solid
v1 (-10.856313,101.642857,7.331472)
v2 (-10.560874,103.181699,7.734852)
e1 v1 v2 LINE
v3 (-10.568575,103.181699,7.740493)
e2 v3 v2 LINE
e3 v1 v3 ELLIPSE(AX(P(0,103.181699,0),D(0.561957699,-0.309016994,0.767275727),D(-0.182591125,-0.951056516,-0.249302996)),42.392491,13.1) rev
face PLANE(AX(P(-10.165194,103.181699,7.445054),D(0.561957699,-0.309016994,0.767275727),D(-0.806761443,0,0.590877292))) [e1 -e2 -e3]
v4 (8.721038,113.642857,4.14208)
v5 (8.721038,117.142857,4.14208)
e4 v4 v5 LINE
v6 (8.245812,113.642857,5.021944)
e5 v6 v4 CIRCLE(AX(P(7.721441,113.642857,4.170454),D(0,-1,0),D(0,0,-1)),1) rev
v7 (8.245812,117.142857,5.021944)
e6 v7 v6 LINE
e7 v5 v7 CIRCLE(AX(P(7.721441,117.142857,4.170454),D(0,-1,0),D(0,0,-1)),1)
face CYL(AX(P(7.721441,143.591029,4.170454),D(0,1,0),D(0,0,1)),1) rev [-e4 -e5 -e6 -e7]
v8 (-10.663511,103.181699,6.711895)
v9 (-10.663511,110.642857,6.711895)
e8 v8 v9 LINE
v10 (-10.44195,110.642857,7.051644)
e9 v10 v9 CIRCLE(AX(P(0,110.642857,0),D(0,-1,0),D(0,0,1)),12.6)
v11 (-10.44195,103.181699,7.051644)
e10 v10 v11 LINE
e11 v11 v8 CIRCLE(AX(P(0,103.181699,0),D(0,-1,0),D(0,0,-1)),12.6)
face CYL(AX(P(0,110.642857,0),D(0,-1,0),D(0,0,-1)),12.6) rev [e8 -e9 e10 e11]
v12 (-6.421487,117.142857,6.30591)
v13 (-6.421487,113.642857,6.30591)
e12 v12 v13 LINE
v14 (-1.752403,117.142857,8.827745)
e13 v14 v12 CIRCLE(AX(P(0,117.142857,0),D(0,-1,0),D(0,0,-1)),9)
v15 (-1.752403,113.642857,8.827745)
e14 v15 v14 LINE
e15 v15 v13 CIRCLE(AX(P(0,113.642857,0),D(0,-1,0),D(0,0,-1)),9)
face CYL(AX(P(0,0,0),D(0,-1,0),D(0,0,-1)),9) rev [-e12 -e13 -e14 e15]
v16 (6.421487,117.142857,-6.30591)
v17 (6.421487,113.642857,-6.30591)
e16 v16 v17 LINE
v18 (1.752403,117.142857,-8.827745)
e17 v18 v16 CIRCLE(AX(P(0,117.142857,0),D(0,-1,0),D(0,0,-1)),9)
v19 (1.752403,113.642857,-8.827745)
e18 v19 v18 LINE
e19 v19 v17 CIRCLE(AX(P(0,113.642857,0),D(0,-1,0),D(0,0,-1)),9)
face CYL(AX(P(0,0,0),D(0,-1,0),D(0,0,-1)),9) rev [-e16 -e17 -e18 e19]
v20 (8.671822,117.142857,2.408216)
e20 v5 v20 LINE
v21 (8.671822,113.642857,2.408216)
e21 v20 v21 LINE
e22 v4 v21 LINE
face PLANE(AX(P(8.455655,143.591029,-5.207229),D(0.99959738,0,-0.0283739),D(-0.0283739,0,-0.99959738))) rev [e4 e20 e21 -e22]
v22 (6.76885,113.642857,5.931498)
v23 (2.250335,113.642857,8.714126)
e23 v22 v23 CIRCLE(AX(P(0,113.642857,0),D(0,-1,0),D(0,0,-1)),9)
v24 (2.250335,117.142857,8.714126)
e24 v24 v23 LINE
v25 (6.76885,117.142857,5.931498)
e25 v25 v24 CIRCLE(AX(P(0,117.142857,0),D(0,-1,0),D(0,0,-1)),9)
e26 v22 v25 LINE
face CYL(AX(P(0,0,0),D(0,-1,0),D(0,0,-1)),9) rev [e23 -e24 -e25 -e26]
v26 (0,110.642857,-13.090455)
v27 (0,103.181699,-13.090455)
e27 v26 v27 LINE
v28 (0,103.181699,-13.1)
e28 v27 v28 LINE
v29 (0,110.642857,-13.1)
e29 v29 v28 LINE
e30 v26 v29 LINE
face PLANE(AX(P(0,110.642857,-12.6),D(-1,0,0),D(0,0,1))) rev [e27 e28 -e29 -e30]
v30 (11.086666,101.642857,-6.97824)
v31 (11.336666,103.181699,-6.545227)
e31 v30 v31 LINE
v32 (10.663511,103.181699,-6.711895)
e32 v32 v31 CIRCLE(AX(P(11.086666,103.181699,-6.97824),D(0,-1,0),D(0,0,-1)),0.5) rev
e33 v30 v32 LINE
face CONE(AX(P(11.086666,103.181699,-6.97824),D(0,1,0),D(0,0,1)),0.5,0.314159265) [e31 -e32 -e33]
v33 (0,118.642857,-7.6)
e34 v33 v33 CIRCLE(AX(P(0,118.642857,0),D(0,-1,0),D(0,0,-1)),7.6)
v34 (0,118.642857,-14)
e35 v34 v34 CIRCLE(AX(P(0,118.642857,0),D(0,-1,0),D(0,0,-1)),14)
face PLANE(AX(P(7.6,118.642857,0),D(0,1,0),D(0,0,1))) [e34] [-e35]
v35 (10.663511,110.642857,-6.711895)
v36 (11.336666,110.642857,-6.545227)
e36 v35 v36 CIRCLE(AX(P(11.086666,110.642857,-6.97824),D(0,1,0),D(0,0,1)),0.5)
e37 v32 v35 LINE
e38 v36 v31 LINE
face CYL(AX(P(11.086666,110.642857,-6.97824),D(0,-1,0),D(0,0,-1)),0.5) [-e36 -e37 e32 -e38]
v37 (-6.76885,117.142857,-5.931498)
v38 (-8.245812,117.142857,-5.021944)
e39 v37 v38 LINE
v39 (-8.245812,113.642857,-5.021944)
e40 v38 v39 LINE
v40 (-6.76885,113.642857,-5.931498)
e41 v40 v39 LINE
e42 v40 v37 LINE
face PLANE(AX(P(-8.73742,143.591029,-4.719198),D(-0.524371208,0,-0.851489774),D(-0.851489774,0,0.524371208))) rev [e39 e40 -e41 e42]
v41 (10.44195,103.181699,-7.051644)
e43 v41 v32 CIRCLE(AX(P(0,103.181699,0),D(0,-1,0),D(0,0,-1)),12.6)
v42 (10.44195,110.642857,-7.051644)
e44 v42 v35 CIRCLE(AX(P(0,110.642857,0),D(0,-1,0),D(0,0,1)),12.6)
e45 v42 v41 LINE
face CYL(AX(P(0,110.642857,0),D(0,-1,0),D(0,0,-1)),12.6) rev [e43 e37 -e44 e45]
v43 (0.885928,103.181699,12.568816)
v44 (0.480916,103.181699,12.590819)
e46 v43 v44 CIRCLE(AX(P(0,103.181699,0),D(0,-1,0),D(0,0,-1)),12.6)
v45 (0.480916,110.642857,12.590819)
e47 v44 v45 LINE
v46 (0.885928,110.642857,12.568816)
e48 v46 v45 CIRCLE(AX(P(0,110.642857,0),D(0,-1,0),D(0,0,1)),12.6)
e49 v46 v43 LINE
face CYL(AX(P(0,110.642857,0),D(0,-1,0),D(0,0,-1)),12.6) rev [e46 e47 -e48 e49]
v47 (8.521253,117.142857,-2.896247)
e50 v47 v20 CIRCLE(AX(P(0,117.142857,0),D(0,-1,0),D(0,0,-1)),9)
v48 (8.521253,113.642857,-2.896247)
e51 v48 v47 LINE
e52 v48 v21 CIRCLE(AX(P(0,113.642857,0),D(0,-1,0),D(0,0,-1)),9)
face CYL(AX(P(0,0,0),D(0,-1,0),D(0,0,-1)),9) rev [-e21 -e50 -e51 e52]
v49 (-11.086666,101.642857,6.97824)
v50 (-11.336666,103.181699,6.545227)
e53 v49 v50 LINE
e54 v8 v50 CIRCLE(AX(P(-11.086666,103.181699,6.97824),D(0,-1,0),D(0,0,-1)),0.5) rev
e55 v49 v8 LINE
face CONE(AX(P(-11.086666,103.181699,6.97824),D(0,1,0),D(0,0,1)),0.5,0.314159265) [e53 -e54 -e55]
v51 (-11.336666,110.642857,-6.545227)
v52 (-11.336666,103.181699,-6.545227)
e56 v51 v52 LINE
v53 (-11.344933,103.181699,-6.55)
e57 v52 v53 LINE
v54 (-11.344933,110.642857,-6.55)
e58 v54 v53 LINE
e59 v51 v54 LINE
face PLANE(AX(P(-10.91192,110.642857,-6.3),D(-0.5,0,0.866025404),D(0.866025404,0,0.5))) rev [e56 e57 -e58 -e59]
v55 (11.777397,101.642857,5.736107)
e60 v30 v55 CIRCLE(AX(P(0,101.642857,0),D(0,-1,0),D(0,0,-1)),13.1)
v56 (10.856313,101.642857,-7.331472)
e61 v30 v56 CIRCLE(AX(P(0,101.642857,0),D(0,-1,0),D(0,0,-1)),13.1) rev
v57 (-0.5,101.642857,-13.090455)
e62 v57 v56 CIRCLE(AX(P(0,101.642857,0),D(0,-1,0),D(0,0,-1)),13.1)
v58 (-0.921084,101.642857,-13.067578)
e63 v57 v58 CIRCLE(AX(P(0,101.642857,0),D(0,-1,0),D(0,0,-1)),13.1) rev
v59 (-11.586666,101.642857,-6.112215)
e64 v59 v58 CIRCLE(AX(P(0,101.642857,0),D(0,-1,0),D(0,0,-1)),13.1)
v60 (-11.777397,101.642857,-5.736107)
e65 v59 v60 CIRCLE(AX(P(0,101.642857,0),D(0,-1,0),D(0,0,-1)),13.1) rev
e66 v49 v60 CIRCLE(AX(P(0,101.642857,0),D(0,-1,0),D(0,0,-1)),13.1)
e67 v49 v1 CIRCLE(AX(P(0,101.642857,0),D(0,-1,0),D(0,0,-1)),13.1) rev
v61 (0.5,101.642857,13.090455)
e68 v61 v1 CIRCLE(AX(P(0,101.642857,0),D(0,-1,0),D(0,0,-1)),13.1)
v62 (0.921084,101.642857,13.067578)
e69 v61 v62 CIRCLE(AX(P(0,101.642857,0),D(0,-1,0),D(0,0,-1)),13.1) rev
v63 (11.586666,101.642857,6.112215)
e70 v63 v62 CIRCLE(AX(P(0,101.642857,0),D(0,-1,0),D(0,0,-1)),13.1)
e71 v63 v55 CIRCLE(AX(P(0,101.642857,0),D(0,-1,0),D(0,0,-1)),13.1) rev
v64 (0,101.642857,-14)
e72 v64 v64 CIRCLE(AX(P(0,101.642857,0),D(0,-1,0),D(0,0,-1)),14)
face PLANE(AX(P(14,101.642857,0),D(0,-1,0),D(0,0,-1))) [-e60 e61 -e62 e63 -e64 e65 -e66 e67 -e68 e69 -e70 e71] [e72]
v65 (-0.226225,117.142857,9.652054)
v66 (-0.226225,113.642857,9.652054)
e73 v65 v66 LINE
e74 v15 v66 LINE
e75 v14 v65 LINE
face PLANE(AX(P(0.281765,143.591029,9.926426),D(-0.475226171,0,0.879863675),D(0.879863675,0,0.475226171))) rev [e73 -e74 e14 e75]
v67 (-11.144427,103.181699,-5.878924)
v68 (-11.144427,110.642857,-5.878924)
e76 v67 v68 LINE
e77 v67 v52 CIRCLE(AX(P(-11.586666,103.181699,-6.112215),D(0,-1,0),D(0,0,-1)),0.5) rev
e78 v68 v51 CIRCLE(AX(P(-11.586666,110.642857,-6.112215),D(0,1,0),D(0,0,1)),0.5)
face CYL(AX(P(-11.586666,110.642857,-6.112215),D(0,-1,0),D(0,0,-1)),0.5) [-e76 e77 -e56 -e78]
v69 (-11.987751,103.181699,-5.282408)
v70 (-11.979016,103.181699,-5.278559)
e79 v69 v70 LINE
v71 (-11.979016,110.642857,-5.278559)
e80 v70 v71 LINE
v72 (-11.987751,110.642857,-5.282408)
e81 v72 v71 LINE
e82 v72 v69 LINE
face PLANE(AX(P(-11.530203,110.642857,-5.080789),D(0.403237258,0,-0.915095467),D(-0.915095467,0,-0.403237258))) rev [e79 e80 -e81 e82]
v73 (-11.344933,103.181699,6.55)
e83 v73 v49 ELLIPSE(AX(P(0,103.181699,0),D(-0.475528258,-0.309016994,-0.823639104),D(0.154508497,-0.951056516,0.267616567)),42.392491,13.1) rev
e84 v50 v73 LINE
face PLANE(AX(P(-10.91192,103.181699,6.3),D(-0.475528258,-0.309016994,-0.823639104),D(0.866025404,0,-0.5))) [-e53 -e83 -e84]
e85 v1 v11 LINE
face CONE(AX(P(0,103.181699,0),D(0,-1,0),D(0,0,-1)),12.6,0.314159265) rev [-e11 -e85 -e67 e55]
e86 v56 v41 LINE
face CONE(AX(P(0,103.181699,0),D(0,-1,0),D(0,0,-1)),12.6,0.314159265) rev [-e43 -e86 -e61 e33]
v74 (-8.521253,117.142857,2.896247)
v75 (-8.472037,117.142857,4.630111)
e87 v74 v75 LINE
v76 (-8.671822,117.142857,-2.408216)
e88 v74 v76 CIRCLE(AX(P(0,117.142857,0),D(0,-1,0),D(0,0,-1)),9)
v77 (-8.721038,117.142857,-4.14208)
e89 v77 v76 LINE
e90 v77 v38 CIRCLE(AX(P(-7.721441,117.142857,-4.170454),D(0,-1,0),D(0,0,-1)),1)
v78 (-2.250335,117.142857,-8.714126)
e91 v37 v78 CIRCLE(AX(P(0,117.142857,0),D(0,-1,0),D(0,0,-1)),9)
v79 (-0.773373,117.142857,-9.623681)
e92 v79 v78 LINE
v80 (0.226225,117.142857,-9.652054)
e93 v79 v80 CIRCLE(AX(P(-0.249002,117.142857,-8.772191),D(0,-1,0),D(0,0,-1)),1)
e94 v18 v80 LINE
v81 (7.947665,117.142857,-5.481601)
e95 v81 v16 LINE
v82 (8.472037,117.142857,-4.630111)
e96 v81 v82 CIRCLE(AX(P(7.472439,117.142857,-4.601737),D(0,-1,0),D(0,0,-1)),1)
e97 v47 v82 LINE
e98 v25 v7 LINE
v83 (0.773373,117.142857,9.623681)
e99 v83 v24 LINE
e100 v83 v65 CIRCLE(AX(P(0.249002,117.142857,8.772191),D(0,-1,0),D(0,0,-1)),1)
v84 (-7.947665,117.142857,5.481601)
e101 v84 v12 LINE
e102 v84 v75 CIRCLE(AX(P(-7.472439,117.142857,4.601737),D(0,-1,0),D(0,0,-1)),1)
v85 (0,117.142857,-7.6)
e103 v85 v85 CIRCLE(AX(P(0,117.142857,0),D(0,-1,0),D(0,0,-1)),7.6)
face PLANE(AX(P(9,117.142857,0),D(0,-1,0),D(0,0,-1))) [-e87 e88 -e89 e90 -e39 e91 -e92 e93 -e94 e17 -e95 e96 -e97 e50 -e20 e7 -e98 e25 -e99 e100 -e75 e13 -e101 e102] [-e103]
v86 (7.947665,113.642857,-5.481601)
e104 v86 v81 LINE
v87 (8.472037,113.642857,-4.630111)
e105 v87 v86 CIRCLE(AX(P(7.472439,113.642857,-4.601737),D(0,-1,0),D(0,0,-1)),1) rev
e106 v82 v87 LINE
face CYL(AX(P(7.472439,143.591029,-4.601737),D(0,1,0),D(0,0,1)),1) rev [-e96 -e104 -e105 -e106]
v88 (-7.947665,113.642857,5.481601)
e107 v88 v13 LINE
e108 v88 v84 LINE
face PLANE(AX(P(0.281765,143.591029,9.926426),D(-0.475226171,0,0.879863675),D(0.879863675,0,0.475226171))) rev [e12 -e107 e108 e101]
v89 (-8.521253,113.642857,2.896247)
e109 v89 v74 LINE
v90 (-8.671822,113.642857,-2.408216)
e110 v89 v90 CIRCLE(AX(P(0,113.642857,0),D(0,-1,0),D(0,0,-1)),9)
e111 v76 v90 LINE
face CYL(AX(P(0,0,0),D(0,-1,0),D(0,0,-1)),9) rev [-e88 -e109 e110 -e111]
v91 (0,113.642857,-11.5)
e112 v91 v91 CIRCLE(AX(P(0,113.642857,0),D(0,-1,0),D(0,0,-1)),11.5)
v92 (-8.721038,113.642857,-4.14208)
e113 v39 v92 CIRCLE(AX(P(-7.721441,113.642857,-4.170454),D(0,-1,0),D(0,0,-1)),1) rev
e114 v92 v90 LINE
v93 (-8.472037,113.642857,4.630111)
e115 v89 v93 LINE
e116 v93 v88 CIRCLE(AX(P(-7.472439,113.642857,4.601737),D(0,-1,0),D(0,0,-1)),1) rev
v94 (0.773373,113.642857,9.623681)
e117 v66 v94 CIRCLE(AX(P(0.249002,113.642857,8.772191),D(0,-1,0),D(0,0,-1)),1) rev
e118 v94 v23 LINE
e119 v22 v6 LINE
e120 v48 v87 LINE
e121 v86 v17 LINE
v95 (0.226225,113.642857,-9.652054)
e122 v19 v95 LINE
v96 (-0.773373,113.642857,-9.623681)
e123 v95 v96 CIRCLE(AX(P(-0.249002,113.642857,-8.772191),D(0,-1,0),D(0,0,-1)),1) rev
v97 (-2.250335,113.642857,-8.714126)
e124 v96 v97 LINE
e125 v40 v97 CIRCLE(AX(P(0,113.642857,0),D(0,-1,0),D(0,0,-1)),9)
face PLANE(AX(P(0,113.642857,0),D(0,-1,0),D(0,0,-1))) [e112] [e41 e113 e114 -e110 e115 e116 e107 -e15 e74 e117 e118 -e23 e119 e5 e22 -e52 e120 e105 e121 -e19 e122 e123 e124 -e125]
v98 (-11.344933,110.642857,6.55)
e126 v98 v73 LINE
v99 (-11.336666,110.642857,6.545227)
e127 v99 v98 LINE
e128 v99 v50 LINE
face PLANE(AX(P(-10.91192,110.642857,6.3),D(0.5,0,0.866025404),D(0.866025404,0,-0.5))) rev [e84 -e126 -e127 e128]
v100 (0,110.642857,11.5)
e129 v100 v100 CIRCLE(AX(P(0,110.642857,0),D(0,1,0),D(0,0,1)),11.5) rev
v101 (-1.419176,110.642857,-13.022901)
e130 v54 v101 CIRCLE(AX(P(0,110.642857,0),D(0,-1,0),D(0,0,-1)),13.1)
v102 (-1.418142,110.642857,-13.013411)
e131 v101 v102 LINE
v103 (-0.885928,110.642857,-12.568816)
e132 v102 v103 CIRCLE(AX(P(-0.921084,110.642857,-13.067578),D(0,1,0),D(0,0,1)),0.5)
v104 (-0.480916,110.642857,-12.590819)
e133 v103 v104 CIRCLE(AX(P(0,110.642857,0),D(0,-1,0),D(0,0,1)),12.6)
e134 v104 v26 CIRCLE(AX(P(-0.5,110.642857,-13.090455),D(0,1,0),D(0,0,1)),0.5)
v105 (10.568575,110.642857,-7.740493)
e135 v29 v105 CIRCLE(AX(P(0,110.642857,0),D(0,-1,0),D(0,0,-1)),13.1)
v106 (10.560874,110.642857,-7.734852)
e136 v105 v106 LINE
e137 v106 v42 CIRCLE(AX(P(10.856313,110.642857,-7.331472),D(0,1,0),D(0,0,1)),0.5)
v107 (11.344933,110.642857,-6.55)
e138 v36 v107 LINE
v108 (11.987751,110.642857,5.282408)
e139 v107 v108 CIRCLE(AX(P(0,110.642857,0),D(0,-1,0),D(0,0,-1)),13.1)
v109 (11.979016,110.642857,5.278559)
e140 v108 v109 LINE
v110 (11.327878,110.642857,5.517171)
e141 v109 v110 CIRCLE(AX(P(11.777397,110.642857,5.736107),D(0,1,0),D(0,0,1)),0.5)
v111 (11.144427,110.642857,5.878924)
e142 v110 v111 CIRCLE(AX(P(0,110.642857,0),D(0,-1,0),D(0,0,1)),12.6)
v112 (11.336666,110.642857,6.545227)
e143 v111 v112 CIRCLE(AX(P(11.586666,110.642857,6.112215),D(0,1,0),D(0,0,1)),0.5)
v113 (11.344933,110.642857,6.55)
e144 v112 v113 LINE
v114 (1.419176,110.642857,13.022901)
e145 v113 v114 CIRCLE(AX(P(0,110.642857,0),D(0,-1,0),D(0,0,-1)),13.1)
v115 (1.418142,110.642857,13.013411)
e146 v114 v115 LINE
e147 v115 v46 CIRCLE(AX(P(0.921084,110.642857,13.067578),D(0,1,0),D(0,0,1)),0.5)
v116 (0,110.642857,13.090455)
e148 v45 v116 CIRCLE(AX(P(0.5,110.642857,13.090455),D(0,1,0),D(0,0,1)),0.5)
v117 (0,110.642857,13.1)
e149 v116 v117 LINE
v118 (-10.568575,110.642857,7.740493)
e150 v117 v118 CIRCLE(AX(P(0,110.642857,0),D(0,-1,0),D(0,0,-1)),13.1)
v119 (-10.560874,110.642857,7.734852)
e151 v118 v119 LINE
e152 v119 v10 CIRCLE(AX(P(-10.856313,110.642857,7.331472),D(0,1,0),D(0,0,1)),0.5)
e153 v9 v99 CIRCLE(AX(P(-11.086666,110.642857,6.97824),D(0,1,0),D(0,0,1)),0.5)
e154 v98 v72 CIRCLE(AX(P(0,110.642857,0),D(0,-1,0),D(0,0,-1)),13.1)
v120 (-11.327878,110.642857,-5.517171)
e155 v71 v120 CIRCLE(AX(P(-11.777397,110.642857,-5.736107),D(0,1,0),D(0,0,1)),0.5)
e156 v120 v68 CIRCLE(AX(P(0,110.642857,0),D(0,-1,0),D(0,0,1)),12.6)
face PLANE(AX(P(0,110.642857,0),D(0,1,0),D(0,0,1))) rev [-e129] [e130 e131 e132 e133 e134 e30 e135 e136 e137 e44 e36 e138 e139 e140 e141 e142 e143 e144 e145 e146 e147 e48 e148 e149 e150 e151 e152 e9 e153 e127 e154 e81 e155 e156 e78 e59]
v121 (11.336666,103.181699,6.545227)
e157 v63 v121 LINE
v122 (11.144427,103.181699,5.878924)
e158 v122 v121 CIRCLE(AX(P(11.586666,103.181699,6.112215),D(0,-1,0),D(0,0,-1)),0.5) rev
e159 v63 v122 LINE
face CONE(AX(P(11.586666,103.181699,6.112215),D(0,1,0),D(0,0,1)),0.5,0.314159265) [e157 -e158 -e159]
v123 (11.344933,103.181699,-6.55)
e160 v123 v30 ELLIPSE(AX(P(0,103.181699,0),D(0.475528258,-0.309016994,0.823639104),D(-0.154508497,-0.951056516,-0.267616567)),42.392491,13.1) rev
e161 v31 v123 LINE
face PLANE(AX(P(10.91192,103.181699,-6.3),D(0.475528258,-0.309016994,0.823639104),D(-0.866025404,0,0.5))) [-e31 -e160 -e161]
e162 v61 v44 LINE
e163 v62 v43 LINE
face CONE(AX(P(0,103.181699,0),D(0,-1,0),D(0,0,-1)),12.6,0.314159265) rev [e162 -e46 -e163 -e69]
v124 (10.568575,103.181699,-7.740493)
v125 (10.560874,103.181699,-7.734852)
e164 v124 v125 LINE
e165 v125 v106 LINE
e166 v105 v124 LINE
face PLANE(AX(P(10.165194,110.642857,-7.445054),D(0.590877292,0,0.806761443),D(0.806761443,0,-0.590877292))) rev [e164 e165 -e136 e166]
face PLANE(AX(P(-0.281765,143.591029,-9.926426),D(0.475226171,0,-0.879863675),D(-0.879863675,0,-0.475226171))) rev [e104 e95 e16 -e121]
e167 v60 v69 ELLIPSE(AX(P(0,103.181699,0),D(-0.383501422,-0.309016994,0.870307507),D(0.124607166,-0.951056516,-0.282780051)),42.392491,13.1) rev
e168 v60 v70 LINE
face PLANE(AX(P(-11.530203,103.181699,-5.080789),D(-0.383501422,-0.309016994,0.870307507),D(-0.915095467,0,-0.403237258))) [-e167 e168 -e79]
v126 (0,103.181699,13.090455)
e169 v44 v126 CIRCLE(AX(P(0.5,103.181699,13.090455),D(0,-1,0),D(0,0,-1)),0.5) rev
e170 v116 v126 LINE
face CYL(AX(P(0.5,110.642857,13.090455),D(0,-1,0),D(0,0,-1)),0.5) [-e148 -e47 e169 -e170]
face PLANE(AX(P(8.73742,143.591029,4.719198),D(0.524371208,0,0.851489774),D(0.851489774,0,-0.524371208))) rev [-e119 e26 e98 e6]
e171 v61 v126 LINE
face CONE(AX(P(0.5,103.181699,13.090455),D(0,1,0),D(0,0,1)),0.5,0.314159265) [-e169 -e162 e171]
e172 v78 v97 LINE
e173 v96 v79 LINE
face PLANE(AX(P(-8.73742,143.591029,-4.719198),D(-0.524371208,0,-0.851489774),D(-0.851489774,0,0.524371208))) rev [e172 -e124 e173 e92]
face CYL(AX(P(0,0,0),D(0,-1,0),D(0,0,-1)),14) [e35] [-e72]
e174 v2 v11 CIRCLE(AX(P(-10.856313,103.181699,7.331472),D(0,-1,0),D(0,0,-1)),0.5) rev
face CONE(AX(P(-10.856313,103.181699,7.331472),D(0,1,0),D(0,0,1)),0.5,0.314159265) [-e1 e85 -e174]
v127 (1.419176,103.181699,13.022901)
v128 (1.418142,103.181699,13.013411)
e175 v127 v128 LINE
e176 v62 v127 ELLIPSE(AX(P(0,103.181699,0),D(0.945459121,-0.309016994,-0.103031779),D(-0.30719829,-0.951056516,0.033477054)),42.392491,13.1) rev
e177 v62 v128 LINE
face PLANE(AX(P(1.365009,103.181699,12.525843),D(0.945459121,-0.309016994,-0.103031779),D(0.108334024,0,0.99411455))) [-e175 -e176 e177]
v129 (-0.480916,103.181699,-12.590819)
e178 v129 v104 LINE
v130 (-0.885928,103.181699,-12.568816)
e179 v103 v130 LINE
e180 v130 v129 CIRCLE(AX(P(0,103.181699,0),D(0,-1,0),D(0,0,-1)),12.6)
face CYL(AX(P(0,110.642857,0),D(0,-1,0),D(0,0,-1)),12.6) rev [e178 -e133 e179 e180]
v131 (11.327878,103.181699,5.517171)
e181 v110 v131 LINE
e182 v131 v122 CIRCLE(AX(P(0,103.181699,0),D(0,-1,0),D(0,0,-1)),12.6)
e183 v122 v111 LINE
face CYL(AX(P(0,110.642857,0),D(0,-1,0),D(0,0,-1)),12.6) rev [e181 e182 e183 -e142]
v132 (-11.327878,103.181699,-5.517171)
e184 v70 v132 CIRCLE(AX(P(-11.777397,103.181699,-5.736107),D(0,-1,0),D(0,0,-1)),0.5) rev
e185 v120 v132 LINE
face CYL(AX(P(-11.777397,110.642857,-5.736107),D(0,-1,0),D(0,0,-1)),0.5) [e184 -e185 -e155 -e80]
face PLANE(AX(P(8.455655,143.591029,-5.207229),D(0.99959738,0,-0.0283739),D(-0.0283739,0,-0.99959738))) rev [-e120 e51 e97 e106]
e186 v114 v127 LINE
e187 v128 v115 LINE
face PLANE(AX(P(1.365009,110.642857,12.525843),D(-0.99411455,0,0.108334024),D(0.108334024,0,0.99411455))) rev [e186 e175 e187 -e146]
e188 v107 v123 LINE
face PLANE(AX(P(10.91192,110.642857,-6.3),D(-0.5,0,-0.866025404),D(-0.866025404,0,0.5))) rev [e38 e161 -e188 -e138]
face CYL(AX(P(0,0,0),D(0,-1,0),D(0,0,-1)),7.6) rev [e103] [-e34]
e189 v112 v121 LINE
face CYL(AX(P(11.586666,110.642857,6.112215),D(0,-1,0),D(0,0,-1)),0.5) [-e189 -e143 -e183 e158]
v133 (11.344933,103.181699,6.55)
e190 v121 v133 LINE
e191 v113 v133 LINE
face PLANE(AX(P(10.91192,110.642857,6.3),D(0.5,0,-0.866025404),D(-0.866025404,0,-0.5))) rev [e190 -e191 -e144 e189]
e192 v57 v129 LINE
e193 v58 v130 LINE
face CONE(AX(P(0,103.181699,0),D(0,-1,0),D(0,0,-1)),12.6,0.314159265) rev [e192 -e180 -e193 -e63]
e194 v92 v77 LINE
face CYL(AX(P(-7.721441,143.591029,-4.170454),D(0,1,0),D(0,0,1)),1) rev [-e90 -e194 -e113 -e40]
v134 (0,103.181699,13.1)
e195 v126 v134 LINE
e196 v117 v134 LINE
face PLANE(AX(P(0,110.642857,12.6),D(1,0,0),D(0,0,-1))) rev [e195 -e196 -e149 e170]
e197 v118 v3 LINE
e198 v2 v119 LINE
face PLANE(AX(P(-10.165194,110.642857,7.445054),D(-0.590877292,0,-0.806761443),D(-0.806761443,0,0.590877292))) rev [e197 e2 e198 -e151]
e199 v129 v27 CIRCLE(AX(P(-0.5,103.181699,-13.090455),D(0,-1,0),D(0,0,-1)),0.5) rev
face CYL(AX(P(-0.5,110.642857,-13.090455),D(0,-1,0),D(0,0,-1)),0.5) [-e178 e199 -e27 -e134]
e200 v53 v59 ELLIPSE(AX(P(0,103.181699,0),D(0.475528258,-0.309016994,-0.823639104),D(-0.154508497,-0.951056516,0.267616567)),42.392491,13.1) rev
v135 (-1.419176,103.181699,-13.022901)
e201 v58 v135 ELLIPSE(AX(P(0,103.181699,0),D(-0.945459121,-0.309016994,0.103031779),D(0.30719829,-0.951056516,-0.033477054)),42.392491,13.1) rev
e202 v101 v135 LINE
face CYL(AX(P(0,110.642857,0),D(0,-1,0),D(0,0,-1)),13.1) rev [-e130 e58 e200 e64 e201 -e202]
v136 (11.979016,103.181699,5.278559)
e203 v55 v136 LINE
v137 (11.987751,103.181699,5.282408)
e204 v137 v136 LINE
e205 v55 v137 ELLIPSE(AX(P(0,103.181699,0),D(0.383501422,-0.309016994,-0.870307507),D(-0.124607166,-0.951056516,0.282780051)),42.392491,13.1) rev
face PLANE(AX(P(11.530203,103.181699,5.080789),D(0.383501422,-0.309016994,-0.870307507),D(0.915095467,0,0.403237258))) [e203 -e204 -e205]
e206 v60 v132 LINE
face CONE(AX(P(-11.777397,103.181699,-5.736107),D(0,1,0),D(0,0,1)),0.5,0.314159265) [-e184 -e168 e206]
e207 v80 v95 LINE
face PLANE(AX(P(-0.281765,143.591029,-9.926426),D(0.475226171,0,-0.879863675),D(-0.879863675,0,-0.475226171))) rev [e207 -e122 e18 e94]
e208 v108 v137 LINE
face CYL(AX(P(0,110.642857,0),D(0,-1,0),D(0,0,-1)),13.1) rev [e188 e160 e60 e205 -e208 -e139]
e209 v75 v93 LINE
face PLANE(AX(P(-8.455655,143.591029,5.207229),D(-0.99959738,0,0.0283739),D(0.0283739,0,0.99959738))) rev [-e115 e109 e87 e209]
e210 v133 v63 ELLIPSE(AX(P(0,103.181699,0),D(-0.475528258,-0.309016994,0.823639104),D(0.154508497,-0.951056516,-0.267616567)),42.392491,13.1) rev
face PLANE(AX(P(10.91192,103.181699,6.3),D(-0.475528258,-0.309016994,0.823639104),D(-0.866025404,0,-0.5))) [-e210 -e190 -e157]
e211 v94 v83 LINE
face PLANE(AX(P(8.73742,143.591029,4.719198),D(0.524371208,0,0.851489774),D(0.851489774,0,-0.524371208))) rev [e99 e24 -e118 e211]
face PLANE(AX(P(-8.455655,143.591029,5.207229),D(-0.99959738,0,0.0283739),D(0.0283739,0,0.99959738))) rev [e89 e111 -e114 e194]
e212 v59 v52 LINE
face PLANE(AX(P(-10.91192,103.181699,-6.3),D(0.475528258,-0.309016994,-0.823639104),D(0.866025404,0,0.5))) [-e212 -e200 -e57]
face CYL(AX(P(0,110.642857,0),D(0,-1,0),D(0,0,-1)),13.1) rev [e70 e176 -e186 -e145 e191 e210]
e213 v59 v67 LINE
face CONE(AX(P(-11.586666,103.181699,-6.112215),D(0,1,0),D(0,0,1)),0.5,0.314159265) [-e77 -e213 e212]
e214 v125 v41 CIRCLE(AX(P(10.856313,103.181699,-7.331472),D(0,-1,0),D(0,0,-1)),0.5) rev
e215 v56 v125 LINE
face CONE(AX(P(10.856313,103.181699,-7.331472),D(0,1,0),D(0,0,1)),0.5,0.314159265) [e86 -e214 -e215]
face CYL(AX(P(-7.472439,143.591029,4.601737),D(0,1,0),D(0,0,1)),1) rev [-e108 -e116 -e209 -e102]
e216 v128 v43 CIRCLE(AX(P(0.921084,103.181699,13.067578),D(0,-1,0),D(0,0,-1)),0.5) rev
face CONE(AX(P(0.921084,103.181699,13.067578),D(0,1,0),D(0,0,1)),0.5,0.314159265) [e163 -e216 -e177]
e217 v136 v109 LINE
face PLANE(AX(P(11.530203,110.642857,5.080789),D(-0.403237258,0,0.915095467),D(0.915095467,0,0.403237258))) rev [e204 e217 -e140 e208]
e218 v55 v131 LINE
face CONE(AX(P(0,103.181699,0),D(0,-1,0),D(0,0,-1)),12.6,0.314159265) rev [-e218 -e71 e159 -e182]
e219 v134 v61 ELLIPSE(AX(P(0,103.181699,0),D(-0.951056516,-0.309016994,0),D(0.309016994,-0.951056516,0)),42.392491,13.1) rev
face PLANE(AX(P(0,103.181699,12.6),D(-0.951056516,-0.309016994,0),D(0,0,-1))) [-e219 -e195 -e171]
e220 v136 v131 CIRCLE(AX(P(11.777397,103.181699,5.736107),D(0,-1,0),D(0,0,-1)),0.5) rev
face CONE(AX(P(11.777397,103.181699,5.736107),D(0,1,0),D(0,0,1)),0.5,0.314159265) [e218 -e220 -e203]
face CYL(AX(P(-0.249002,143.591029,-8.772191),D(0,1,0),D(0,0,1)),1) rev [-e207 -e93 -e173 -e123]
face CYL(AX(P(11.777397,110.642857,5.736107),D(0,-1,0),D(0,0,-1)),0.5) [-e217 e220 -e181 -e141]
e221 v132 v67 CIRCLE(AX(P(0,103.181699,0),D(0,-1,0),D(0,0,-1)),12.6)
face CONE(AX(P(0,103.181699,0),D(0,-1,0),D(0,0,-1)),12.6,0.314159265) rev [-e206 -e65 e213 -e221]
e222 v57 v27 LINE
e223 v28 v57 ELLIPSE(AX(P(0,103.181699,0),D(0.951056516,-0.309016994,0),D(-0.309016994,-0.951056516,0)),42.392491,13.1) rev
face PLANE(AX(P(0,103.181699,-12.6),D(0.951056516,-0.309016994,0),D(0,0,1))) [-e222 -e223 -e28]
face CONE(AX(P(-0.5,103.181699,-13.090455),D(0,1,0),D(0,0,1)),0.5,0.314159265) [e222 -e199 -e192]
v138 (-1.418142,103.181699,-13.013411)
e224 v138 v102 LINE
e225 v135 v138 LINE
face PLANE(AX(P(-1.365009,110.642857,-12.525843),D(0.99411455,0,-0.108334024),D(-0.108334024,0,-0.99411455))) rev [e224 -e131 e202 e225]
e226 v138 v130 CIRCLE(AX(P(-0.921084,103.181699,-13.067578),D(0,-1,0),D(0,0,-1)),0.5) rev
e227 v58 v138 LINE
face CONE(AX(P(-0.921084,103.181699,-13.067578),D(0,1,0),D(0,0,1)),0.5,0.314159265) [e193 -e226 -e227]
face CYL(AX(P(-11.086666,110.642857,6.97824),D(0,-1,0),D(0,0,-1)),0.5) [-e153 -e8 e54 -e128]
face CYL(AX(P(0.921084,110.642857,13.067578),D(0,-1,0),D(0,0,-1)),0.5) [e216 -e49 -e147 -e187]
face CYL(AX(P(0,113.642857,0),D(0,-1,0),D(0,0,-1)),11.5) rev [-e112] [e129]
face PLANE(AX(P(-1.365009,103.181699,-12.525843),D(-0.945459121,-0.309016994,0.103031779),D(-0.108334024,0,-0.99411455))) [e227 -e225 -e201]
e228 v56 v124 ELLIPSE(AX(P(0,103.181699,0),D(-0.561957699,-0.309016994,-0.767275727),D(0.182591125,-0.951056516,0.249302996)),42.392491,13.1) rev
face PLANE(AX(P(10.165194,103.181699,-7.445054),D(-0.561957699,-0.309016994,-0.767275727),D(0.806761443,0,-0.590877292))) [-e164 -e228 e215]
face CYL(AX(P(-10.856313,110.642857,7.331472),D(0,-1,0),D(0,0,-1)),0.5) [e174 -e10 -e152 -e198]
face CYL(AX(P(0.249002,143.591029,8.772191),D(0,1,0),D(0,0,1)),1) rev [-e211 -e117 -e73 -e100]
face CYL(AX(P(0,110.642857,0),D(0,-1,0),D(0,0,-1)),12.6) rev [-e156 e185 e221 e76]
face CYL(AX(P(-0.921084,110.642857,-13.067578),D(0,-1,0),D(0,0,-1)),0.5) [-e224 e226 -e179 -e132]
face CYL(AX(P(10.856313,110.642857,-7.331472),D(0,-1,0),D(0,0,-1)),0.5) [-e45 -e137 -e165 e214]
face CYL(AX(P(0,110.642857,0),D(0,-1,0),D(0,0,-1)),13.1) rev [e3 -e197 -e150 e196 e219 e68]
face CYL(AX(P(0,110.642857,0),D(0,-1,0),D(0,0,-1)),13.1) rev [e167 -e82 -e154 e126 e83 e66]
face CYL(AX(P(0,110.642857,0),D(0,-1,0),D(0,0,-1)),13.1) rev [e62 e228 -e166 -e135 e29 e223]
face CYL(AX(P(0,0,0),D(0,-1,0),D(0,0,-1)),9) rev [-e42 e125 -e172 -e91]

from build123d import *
from OCP.BRepFilletAPI import BRepFilletAPI_MakeChamfer

# Parameters (mm, degrees)
CUT_EXTRUDE_1_DEPTH  = 15.5
SKETCH_4_R           = 11.5
CUT_EXTRUDE_9_DEPTH  = 12
CUT_EXTRUDE_10_DEPTH = 9
FILLET_1_R           = 1
FILLET_2_R           = 0.5
CHAMFER_1_SIZE       = 1.538841769
CHAMFER_1_SIZE_2     = 0.5


with BuildPart() as part:
    # Эскиз1 → Повернуть1 (revolve)
    with BuildSketch(Plane.XY, mode=Mode.PRIVATE) as revolve_1_sk:
        Polygon((7.6, 118.642857143), (14, 118.642857143), (14, 101.642857143), (9, 101.642857143), (9, 117.142857143), (7.6, 117.142857143), align=None)
    revolve(revolve_1_sk.sketch.rotate(Axis((0, 0, 0), (0, 1, 0)), 90), axis=Axis((0, 0, 0), (0, 1, 0)))

    # Эскиз2 → Вырез-Вытянуть1 (cut)
    with BuildSketch(Plane.XZ.offset(-101.642857143)):
        Polygon((0.281764878, 9.926426441), (-8.455655027, 5.207228763), (-8.737419906, -4.719197678), (-0.281764878, -9.926426441), (8.455655027, -5.207228763), (8.737419906, 4.719197678), align=None)
    extrude(amount=-CUT_EXTRUDE_1_DEPTH, mode=Mode.SUBTRACT)

    # Эскиз4 → Вырез-Вытянуть9 (cut)
    with BuildSketch(Plane.XZ.offset(-101.642857143)):
        with Locations(Location((0, 0, 0), (0, 0, 270))):
            Circle(SKETCH_4_R)
    extrude(amount=-CUT_EXTRUDE_9_DEPTH, mode=Mode.SUBTRACT)

    # Эскиз5 → Вырез-Вытянуть10 (cut)
    with BuildSketch(Plane.XZ.offset(-101.642857143)):
        with BuildLine():
            Line((0, 12.6), (0, 13.1))
            ThreePointArc((0, 13.1), (-5.924928182, 11.683545097), (-10.568574903, 7.740492524))
            Line((-10.568574903, 7.740492524), (-10.165194182, 7.445053878))
            ThreePointArc((-10.165194182, 7.445053878), (-10.554097478, 6.882661289), (-10.911920088, 6.3))
            Line((-10.911920088, 6.3), (-11.34493279, 6.55))
            ThreePointArc((-11.34493279, 6.55), (-13.080710951, 0.710634227), (-11.987750615, -5.282408086))
            Line((-11.987750615, -5.282408086), (-11.530202882, -5.080789457))
            ThreePointArc((-11.530202882, -5.080789457), (-11.237608261, -5.698785885), (-10.911920088, -6.3))
            Line((-10.911920088, -6.3), (-11.34493279, -6.55))
            ThreePointArc((-11.34493279, -6.55), (-7.155782769, -10.97291087), (-1.419175712, -13.02290061))
            Line((-1.419175712, -13.02290061), (-1.3650087, -12.525843335))
            ThreePointArc((-1.3650087, -12.525843335), (-0.683510783, -12.581447175), (0, -12.6))
            Line((0, -12.6), (0, -13.1))
            ThreePointArc((0, -13.1), (5.924928182, -11.683545097), (10.568574903, -7.740492524))
            Line((10.568574903, -7.740492524), (10.165194182, -7.445053878))
            ThreePointArc((10.165194182, -7.445053878), (10.554097478, -6.882661289), (10.911920088, -6.3))
            Line((10.911920088, -6.3), (11.34493279, -6.55))
            ThreePointArc((11.34493279, -6.55), (13.080710951, -0.710634227), (11.987750615, 5.282408086))
            Line((11.987750615, 5.282408086), (11.530202882, 5.080789457))
            ThreePointArc((11.530202882, 5.080789457), (11.237608261, 5.698785885), (10.911920088, 6.3))
            Line((10.911920088, 6.3), (11.34493279, 6.55))
            ThreePointArc((11.34493279, 6.55), (7.155782769, 10.97291087), (1.419175712, 13.02290061))
            Line((1.419175712, 13.02290061), (1.3650087, 12.525843335))
            ThreePointArc((1.3650087, 12.525843335), (0.683510783, 12.581447175), (0, 12.6))
        make_face()
    extrude(amount=-CUT_EXTRUDE_10_DEPTH, mode=Mode.SUBTRACT)

    # Скругление1
    fillet_1_edges = [part.edges().sort_by_distance(p)[0] for p in [
        (-8.455655027, 115.392857143, 5.207228763),
        (0.281764878, 115.392857143, 9.926426441),
        (8.737419906, 115.392857143, 4.719197678),
        (8.455655027, 115.392857143, -5.207228763),
        (-0.281764878, 115.392857143, -9.926426441),
        (-8.737419906, 115.392857143, -4.719197678),
    ]]
    fillet(fillet_1_edges, radius=FILLET_1_R)

    # Скругление2
    fillet_2_edges = [part.edges().sort_by_distance(p)[0] for p in [
        (0, 106.142857143, 12.6),
        (1.3650087, 106.142857143, 12.525843335),
        (10.911920088, 106.142857143, 6.3),
        (11.530202882, 106.142857143, 5.080789457),
        (10.911920088, 106.142857143, -6.3),
        (10.165194182, 106.142857143, -7.445053878),
        (0, 106.142857143, -12.6),
        (-1.3650087, 106.142857143, -12.525843335),
        (-10.911920088, 106.142857143, -6.3),
        (-11.530202882, 106.142857143, -5.080789457),
        (-10.911920088, 106.142857143, 6.3),
        (-10.165194182, 106.142857143, 7.445053878),
    ]]
    fillet(fillet_2_edges, radius=FILLET_2_R)

    # Фаска1
    chamfer_1_edges_1 = [part.edges().sort_by_distance(p)[0] for p in [
        (-10.564724448, 101.642857143, 7.737672426),
    ]]
    chamfer_1_side_1 = [part.faces().sort_by_distance(p)[0] for p in [
        (-10.564724448, 101.652857143, 7.737672426),
    ]]
    chamfer_1_edges_2 = [part.edges().sort_by_distance(p)[0] for p in [
        (-11.983383111, 101.642857143, -5.280483543),
    ]]
    chamfer_1_side_2 = [part.faces().sort_by_distance(p)[0] for p in [
        (-11.983383111, 101.652857143, -5.280483543),
    ]]
    chamfer_1_edges_3 = [part.edges().sort_by_distance(p)[0] for p in [
        (-1.418658663, 101.642857143, -13.018155968),
    ]]
    chamfer_1_side_3 = [part.faces().sort_by_distance(p)[0] for p in [
        (-1.418658663, 101.652857143, -13.018155968),
    ]]
    chamfer_1_edges_4 = [part.edges().sort_by_distance(p)[0] for p in [
        (10.564724448, 101.642857143, -7.737672426),
    ]]
    chamfer_1_side_4 = [part.faces().sort_by_distance(p)[0] for p in [
        (10.564724448, 101.652857143, -7.737672426),
    ]]
    chamfer_1_edges_5 = [part.edges().sort_by_distance(p)[0] for p in [
        (11.983383111, 101.642857143, 5.280483543),
    ]]
    chamfer_1_side_5 = [part.faces().sort_by_distance(p)[0] for p in [
        (11.983383111, 101.652857143, 5.280483543),
    ]]
    chamfer_1_edges_6 = [part.edges().sort_by_distance(p)[0] for p in [
        (1.418658663, 101.642857143, 13.018155968),
    ]]
    chamfer_1_side_6 = [part.faces().sort_by_distance(p)[0] for p in [
        (1.418658663, 101.652857143, 13.018155968),
    ]]
    chamfer_1_edges_7 = [part.edges().sort_by_distance(p)[0] for p in [
        (10.554097478, 101.642857143, -6.882661289),
    ]]
    chamfer_1_side_7 = [part.faces().sort_by_distance(p)[0] for p in [
        (10.554097478, 101.652857143, -6.882661289),
    ]]
    chamfer_1_edges_8 = [part.edges().sort_by_distance(p)[0] for p in [
        (0.683510783, 101.642857143, 12.581447175),
    ]]
    chamfer_1_side_8 = [part.faces().sort_by_distance(p)[0] for p in [
        (0.683510783, 101.652857143, 12.581447175),
    ]]
    chamfer_1_edges_9 = [part.edges().sort_by_distance(p)[0] for p in [
        (11.340799483, 101.642857143, 6.547613634),
    ]]
    chamfer_1_side_9 = [part.faces().sort_by_distance(p)[0] for p in [
        (11.340799483, 101.652857143, 6.547613634),
    ]]
    chamfer_1_edges_10 = [part.edges().sort_by_distance(p)[0] for p in [
        (11.237608261, 101.642857143, 5.698785885),
    ]]
    chamfer_1_side_10 = [part.faces().sort_by_distance(p)[0] for p in [
        (11.237608261, 101.652857143, 5.698785885),
    ]]
    chamfer_1_edges_11 = [part.edges().sort_by_distance(p)[0] for p in [
        (11.340799483, 101.642857143, -6.547613634),
    ]]
    chamfer_1_side_11 = [part.faces().sort_by_distance(p)[0] for p in [
        (11.340799483, 101.652857143, -6.547613634),
    ]]
    chamfer_1_edges_12 = [part.edges().sort_by_distance(p)[0] for p in [
        (0, 101.642857143, -13.095227269),
    ]]
    chamfer_1_side_12 = [part.faces().sort_by_distance(p)[0] for p in [
        (0, 101.652857143, -13.095227269),
    ]]
    chamfer_1_edges_13 = [part.edges().sort_by_distance(p)[0] for p in [
        (-0.683510783, 101.642857143, -12.581447175),
    ]]
    chamfer_1_side_13 = [part.faces().sort_by_distance(p)[0] for p in [
        (-0.683510783, 101.652857143, -12.581447175),
    ]]
    chamfer_1_edges_14 = [part.edges().sort_by_distance(p)[0] for p in [
        (-11.340799483, 101.642857143, -6.547613634),
    ]]
    chamfer_1_side_14 = [part.faces().sort_by_distance(p)[0] for p in [
        (-11.340799483, 101.652857143, -6.547613634),
    ]]
    chamfer_1_edges_15 = [part.edges().sort_by_distance(p)[0] for p in [
        (-11.237608261, 101.642857143, -5.698785885),
    ]]
    chamfer_1_side_15 = [part.faces().sort_by_distance(p)[0] for p in [
        (-11.237608261, 101.652857143, -5.698785885),
    ]]
    chamfer_1_edges_16 = [part.edges().sort_by_distance(p)[0] for p in [
        (-11.340799483, 101.642857143, 6.547613634),
    ]]
    chamfer_1_side_16 = [part.faces().sort_by_distance(p)[0] for p in [
        (-11.340799483, 101.652857143, 6.547613634),
    ]]
    chamfer_1_edges_17 = [part.edges().sort_by_distance(p)[0] for p in [
        (-10.554097478, 101.642857143, 6.882661289),
    ]]
    chamfer_1_side_17 = [part.faces().sort_by_distance(p)[0] for p in [
        (-10.554097478, 101.652857143, 6.882661289),
    ]]
    chamfer_1_edges_18 = [part.edges().sort_by_distance(p)[0] for p in [
        (0, 101.642857143, 13.095227269),
    ]]
    chamfer_1_side_18 = [part.faces().sort_by_distance(p)[0] for p in [
        (0, 101.652857143, 13.095227269),
    ]]
    chamfer_1_edges_19 = [part.edges().sort_by_distance(p)[0] for p in [
        (0.139762589, 101.642857143, 12.74371399),
    ]]
    chamfer_1_side_19 = [part.faces().sort_by_distance(p)[0] for p in [
        (0.139762589, 101.652857143, 12.74371399),
    ]]
    chamfer_1_edges_20 = [part.edges().sort_by_distance(p)[0] for p in [
        (1.241637792, 101.642857143, 12.683852547),
    ]]
    chamfer_1_side_20 = [part.faces().sort_by_distance(p)[0] for p in [
        (1.241637792, 101.652857143, 12.683852547),
    ]]
    chamfer_1_edges_21 = [part.edges().sort_by_distance(p)[0] for p in [
        (11.106261348, 101.642857143, 6.250819042),
    ]]
    chamfer_1_side_21 = [part.faces().sort_by_distance(p)[0] for p in [
        (11.106261348, 101.652857143, 6.250819042),
    ]]
    chamfer_1_edges_22 = [part.edges().sort_by_distance(p)[0] for p in [
        (11.605357419, 101.642857143, 5.266636403),
    ]]
    chamfer_1_side_22 = [part.faces().sort_by_distance(p)[0] for p in [
        (11.605357419, 101.652857143, 5.266636403),
    ]]
    chamfer_1_edges_23 = [part.edges().sort_by_distance(p)[0] for p in [
        (-10.966498759, 101.642857143, 6.492894947),
    ]]
    chamfer_1_side_23 = [part.faces().sort_by_distance(p)[0] for p in [
        (-10.966498759, 101.652857143, 6.492894947),
    ]]
    chamfer_1_edges_24 = [part.edges().sort_by_distance(p)[0] for p in [
        (-10.363719627, 101.642857143, 7.417216143),
    ]]
    chamfer_1_side_24 = [part.faces().sort_by_distance(p)[0] for p in [
        (-10.363719627, 101.652857143, 7.417216143),
    ]]
    chamfer_1_edges_25 = [part.edges().sort_by_distance(p)[0] for p in [
        (-11.605357419, 101.642857143, -5.266636403),
    ]]
    chamfer_1_side_25 = [part.faces().sort_by_distance(p)[0] for p in [
        (-11.605357419, 101.652857143, -5.266636403),
    ]]
    chamfer_1_edges_26 = [part.edges().sort_by_distance(p)[0] for p in [
        (-11.106261348, 101.642857143, -6.250819042),
    ]]
    chamfer_1_side_26 = [part.faces().sort_by_distance(p)[0] for p in [
        (-11.106261348, 101.652857143, -6.250819042),
    ]]
    chamfer_1_edges_27 = [part.edges().sort_by_distance(p)[0] for p in [
        (-0.139762589, 101.642857143, -12.74371399),
    ]]
    chamfer_1_side_27 = [part.faces().sort_by_distance(p)[0] for p in [
        (-0.139762589, 101.652857143, -12.74371399),
    ]]
    chamfer_1_edges_28 = [part.edges().sort_by_distance(p)[0] for p in [
        (-1.241637792, 101.642857143, -12.683852547),
    ]]
    chamfer_1_side_28 = [part.faces().sort_by_distance(p)[0] for p in [
        (-1.241637792, 101.652857143, -12.683852547),
    ]]
    chamfer_1_edges_29 = [part.edges().sort_by_distance(p)[0] for p in [
        (10.966498759, 101.642857143, -6.492894947),
    ]]
    chamfer_1_side_29 = [part.faces().sort_by_distance(p)[0] for p in [
        (10.966498759, 101.652857143, -6.492894947),
    ]]
    chamfer_1_edges_30 = [part.edges().sort_by_distance(p)[0] for p in [
        (10.363719627, 101.642857143, -7.417216143),
    ]]
    chamfer_1_side_30 = [part.faces().sort_by_distance(p)[0] for p in [
        (10.363719627, 101.652857143, -7.417216143),
    ]]
    chamfer_1 = BRepFilletAPI_MakeChamfer(part.part.solid().wrapped)
    for e in chamfer_1_edges_1:
        chamfer_1.Add(CHAMFER_1_SIZE - 0.0001, CHAMFER_1_SIZE_2 - 0.0001, e.wrapped, chamfer_1_side_1[0].wrapped)
    for e in chamfer_1_edges_2:
        chamfer_1.Add(CHAMFER_1_SIZE - 0.0001, CHAMFER_1_SIZE_2 - 0.0001, e.wrapped, chamfer_1_side_2[0].wrapped)
    for e in chamfer_1_edges_3:
        chamfer_1.Add(CHAMFER_1_SIZE - 0.0001, CHAMFER_1_SIZE_2 - 0.0001, e.wrapped, chamfer_1_side_3[0].wrapped)
    for e in chamfer_1_edges_4:
        chamfer_1.Add(CHAMFER_1_SIZE - 0.0001, CHAMFER_1_SIZE_2 - 0.0001, e.wrapped, chamfer_1_side_4[0].wrapped)
    for e in chamfer_1_edges_5:
        chamfer_1.Add(CHAMFER_1_SIZE - 0.0001, CHAMFER_1_SIZE_2 - 0.0001, e.wrapped, chamfer_1_side_5[0].wrapped)
    for e in chamfer_1_edges_6:
        chamfer_1.Add(CHAMFER_1_SIZE - 0.0001, CHAMFER_1_SIZE_2 - 0.0001, e.wrapped, chamfer_1_side_6[0].wrapped)
    for e in chamfer_1_edges_7:
        chamfer_1.Add(CHAMFER_1_SIZE - 0.0001, CHAMFER_1_SIZE_2 - 0.0001, e.wrapped, chamfer_1_side_7[0].wrapped)
    for e in chamfer_1_edges_8:
        chamfer_1.Add(CHAMFER_1_SIZE - 0.0001, CHAMFER_1_SIZE_2 - 0.0001, e.wrapped, chamfer_1_side_8[0].wrapped)
    for e in chamfer_1_edges_9:
        chamfer_1.Add(CHAMFER_1_SIZE - 0.0001, CHAMFER_1_SIZE_2 - 0.0001, e.wrapped, chamfer_1_side_9[0].wrapped)
    for e in chamfer_1_edges_10:
        chamfer_1.Add(CHAMFER_1_SIZE - 0.0001, CHAMFER_1_SIZE_2 - 0.0001, e.wrapped, chamfer_1_side_10[0].wrapped)
    for e in chamfer_1_edges_11:
        chamfer_1.Add(CHAMFER_1_SIZE - 0.0001, CHAMFER_1_SIZE_2 - 0.0001, e.wrapped, chamfer_1_side_11[0].wrapped)
    for e in chamfer_1_edges_12:
        chamfer_1.Add(CHAMFER_1_SIZE - 0.0001, CHAMFER_1_SIZE_2 - 0.0001, e.wrapped, chamfer_1_side_12[0].wrapped)
    for e in chamfer_1_edges_13:
        chamfer_1.Add(CHAMFER_1_SIZE - 0.0001, CHAMFER_1_SIZE_2 - 0.0001, e.wrapped, chamfer_1_side_13[0].wrapped)
    for e in chamfer_1_edges_14:
        chamfer_1.Add(CHAMFER_1_SIZE - 0.0001, CHAMFER_1_SIZE_2 - 0.0001, e.wrapped, chamfer_1_side_14[0].wrapped)
    for e in chamfer_1_edges_15:
        chamfer_1.Add(CHAMFER_1_SIZE - 0.0001, CHAMFER_1_SIZE_2 - 0.0001, e.wrapped, chamfer_1_side_15[0].wrapped)
    for e in chamfer_1_edges_16:
        chamfer_1.Add(CHAMFER_1_SIZE - 0.0001, CHAMFER_1_SIZE_2 - 0.0001, e.wrapped, chamfer_1_side_16[0].wrapped)
    for e in chamfer_1_edges_17:
        chamfer_1.Add(CHAMFER_1_SIZE - 0.0001, CHAMFER_1_SIZE_2 - 0.0001, e.wrapped, chamfer_1_side_17[0].wrapped)
    for e in chamfer_1_edges_18:
        chamfer_1.Add(CHAMFER_1_SIZE - 0.0001, CHAMFER_1_SIZE_2 - 0.0001, e.wrapped, chamfer_1_side_18[0].wrapped)
    for e in chamfer_1_edges_19:
        chamfer_1.Add(CHAMFER_1_SIZE - 0.0001, CHAMFER_1_SIZE_2 - 0.0001, e.wrapped, chamfer_1_side_19[0].wrapped)
    for e in chamfer_1_edges_20:
        chamfer_1.Add(CHAMFER_1_SIZE - 0.0001, CHAMFER_1_SIZE_2 - 0.0001, e.wrapped, chamfer_1_side_20[0].wrapped)
    for e in chamfer_1_edges_21:
        chamfer_1.Add(CHAMFER_1_SIZE - 0.0001, CHAMFER_1_SIZE_2 - 0.0001, e.wrapped, chamfer_1_side_21[0].wrapped)
    for e in chamfer_1_edges_22:
        chamfer_1.Add(CHAMFER_1_SIZE - 0.0001, CHAMFER_1_SIZE_2 - 0.0001, e.wrapped, chamfer_1_side_22[0].wrapped)
    for e in chamfer_1_edges_23:
        chamfer_1.Add(CHAMFER_1_SIZE - 0.0001, CHAMFER_1_SIZE_2 - 0.0001, e.wrapped, chamfer_1_side_23[0].wrapped)
    for e in chamfer_1_edges_24:
        chamfer_1.Add(CHAMFER_1_SIZE - 0.0001, CHAMFER_1_SIZE_2 - 0.0001, e.wrapped, chamfer_1_side_24[0].wrapped)
    for e in chamfer_1_edges_25:
        chamfer_1.Add(CHAMFER_1_SIZE - 0.0001, CHAMFER_1_SIZE_2 - 0.0001, e.wrapped, chamfer_1_side_25[0].wrapped)
    for e in chamfer_1_edges_26:
        chamfer_1.Add(CHAMFER_1_SIZE - 0.0001, CHAMFER_1_SIZE_2 - 0.0001, e.wrapped, chamfer_1_side_26[0].wrapped)
    for e in chamfer_1_edges_27:
        chamfer_1.Add(CHAMFER_1_SIZE - 0.0001, CHAMFER_1_SIZE_2 - 0.0001, e.wrapped, chamfer_1_side_27[0].wrapped)
    for e in chamfer_1_edges_28:
        chamfer_1.Add(CHAMFER_1_SIZE - 0.0001, CHAMFER_1_SIZE_2 - 0.0001, e.wrapped, chamfer_1_side_28[0].wrapped)
    for e in chamfer_1_edges_29:
        chamfer_1.Add(CHAMFER_1_SIZE - 0.0001, CHAMFER_1_SIZE_2 - 0.0001, e.wrapped, chamfer_1_side_29[0].wrapped)
    for e in chamfer_1_edges_30:
        chamfer_1.Add(CHAMFER_1_SIZE - 0.0001, CHAMFER_1_SIZE_2 - 0.0001, e.wrapped, chamfer_1_side_30[0].wrapped)
    add(Compound.cast(chamfer_1.Shape()), mode=Mode.REPLACE)  # a hair under: the kernel refuses the full size


solid = part.part
